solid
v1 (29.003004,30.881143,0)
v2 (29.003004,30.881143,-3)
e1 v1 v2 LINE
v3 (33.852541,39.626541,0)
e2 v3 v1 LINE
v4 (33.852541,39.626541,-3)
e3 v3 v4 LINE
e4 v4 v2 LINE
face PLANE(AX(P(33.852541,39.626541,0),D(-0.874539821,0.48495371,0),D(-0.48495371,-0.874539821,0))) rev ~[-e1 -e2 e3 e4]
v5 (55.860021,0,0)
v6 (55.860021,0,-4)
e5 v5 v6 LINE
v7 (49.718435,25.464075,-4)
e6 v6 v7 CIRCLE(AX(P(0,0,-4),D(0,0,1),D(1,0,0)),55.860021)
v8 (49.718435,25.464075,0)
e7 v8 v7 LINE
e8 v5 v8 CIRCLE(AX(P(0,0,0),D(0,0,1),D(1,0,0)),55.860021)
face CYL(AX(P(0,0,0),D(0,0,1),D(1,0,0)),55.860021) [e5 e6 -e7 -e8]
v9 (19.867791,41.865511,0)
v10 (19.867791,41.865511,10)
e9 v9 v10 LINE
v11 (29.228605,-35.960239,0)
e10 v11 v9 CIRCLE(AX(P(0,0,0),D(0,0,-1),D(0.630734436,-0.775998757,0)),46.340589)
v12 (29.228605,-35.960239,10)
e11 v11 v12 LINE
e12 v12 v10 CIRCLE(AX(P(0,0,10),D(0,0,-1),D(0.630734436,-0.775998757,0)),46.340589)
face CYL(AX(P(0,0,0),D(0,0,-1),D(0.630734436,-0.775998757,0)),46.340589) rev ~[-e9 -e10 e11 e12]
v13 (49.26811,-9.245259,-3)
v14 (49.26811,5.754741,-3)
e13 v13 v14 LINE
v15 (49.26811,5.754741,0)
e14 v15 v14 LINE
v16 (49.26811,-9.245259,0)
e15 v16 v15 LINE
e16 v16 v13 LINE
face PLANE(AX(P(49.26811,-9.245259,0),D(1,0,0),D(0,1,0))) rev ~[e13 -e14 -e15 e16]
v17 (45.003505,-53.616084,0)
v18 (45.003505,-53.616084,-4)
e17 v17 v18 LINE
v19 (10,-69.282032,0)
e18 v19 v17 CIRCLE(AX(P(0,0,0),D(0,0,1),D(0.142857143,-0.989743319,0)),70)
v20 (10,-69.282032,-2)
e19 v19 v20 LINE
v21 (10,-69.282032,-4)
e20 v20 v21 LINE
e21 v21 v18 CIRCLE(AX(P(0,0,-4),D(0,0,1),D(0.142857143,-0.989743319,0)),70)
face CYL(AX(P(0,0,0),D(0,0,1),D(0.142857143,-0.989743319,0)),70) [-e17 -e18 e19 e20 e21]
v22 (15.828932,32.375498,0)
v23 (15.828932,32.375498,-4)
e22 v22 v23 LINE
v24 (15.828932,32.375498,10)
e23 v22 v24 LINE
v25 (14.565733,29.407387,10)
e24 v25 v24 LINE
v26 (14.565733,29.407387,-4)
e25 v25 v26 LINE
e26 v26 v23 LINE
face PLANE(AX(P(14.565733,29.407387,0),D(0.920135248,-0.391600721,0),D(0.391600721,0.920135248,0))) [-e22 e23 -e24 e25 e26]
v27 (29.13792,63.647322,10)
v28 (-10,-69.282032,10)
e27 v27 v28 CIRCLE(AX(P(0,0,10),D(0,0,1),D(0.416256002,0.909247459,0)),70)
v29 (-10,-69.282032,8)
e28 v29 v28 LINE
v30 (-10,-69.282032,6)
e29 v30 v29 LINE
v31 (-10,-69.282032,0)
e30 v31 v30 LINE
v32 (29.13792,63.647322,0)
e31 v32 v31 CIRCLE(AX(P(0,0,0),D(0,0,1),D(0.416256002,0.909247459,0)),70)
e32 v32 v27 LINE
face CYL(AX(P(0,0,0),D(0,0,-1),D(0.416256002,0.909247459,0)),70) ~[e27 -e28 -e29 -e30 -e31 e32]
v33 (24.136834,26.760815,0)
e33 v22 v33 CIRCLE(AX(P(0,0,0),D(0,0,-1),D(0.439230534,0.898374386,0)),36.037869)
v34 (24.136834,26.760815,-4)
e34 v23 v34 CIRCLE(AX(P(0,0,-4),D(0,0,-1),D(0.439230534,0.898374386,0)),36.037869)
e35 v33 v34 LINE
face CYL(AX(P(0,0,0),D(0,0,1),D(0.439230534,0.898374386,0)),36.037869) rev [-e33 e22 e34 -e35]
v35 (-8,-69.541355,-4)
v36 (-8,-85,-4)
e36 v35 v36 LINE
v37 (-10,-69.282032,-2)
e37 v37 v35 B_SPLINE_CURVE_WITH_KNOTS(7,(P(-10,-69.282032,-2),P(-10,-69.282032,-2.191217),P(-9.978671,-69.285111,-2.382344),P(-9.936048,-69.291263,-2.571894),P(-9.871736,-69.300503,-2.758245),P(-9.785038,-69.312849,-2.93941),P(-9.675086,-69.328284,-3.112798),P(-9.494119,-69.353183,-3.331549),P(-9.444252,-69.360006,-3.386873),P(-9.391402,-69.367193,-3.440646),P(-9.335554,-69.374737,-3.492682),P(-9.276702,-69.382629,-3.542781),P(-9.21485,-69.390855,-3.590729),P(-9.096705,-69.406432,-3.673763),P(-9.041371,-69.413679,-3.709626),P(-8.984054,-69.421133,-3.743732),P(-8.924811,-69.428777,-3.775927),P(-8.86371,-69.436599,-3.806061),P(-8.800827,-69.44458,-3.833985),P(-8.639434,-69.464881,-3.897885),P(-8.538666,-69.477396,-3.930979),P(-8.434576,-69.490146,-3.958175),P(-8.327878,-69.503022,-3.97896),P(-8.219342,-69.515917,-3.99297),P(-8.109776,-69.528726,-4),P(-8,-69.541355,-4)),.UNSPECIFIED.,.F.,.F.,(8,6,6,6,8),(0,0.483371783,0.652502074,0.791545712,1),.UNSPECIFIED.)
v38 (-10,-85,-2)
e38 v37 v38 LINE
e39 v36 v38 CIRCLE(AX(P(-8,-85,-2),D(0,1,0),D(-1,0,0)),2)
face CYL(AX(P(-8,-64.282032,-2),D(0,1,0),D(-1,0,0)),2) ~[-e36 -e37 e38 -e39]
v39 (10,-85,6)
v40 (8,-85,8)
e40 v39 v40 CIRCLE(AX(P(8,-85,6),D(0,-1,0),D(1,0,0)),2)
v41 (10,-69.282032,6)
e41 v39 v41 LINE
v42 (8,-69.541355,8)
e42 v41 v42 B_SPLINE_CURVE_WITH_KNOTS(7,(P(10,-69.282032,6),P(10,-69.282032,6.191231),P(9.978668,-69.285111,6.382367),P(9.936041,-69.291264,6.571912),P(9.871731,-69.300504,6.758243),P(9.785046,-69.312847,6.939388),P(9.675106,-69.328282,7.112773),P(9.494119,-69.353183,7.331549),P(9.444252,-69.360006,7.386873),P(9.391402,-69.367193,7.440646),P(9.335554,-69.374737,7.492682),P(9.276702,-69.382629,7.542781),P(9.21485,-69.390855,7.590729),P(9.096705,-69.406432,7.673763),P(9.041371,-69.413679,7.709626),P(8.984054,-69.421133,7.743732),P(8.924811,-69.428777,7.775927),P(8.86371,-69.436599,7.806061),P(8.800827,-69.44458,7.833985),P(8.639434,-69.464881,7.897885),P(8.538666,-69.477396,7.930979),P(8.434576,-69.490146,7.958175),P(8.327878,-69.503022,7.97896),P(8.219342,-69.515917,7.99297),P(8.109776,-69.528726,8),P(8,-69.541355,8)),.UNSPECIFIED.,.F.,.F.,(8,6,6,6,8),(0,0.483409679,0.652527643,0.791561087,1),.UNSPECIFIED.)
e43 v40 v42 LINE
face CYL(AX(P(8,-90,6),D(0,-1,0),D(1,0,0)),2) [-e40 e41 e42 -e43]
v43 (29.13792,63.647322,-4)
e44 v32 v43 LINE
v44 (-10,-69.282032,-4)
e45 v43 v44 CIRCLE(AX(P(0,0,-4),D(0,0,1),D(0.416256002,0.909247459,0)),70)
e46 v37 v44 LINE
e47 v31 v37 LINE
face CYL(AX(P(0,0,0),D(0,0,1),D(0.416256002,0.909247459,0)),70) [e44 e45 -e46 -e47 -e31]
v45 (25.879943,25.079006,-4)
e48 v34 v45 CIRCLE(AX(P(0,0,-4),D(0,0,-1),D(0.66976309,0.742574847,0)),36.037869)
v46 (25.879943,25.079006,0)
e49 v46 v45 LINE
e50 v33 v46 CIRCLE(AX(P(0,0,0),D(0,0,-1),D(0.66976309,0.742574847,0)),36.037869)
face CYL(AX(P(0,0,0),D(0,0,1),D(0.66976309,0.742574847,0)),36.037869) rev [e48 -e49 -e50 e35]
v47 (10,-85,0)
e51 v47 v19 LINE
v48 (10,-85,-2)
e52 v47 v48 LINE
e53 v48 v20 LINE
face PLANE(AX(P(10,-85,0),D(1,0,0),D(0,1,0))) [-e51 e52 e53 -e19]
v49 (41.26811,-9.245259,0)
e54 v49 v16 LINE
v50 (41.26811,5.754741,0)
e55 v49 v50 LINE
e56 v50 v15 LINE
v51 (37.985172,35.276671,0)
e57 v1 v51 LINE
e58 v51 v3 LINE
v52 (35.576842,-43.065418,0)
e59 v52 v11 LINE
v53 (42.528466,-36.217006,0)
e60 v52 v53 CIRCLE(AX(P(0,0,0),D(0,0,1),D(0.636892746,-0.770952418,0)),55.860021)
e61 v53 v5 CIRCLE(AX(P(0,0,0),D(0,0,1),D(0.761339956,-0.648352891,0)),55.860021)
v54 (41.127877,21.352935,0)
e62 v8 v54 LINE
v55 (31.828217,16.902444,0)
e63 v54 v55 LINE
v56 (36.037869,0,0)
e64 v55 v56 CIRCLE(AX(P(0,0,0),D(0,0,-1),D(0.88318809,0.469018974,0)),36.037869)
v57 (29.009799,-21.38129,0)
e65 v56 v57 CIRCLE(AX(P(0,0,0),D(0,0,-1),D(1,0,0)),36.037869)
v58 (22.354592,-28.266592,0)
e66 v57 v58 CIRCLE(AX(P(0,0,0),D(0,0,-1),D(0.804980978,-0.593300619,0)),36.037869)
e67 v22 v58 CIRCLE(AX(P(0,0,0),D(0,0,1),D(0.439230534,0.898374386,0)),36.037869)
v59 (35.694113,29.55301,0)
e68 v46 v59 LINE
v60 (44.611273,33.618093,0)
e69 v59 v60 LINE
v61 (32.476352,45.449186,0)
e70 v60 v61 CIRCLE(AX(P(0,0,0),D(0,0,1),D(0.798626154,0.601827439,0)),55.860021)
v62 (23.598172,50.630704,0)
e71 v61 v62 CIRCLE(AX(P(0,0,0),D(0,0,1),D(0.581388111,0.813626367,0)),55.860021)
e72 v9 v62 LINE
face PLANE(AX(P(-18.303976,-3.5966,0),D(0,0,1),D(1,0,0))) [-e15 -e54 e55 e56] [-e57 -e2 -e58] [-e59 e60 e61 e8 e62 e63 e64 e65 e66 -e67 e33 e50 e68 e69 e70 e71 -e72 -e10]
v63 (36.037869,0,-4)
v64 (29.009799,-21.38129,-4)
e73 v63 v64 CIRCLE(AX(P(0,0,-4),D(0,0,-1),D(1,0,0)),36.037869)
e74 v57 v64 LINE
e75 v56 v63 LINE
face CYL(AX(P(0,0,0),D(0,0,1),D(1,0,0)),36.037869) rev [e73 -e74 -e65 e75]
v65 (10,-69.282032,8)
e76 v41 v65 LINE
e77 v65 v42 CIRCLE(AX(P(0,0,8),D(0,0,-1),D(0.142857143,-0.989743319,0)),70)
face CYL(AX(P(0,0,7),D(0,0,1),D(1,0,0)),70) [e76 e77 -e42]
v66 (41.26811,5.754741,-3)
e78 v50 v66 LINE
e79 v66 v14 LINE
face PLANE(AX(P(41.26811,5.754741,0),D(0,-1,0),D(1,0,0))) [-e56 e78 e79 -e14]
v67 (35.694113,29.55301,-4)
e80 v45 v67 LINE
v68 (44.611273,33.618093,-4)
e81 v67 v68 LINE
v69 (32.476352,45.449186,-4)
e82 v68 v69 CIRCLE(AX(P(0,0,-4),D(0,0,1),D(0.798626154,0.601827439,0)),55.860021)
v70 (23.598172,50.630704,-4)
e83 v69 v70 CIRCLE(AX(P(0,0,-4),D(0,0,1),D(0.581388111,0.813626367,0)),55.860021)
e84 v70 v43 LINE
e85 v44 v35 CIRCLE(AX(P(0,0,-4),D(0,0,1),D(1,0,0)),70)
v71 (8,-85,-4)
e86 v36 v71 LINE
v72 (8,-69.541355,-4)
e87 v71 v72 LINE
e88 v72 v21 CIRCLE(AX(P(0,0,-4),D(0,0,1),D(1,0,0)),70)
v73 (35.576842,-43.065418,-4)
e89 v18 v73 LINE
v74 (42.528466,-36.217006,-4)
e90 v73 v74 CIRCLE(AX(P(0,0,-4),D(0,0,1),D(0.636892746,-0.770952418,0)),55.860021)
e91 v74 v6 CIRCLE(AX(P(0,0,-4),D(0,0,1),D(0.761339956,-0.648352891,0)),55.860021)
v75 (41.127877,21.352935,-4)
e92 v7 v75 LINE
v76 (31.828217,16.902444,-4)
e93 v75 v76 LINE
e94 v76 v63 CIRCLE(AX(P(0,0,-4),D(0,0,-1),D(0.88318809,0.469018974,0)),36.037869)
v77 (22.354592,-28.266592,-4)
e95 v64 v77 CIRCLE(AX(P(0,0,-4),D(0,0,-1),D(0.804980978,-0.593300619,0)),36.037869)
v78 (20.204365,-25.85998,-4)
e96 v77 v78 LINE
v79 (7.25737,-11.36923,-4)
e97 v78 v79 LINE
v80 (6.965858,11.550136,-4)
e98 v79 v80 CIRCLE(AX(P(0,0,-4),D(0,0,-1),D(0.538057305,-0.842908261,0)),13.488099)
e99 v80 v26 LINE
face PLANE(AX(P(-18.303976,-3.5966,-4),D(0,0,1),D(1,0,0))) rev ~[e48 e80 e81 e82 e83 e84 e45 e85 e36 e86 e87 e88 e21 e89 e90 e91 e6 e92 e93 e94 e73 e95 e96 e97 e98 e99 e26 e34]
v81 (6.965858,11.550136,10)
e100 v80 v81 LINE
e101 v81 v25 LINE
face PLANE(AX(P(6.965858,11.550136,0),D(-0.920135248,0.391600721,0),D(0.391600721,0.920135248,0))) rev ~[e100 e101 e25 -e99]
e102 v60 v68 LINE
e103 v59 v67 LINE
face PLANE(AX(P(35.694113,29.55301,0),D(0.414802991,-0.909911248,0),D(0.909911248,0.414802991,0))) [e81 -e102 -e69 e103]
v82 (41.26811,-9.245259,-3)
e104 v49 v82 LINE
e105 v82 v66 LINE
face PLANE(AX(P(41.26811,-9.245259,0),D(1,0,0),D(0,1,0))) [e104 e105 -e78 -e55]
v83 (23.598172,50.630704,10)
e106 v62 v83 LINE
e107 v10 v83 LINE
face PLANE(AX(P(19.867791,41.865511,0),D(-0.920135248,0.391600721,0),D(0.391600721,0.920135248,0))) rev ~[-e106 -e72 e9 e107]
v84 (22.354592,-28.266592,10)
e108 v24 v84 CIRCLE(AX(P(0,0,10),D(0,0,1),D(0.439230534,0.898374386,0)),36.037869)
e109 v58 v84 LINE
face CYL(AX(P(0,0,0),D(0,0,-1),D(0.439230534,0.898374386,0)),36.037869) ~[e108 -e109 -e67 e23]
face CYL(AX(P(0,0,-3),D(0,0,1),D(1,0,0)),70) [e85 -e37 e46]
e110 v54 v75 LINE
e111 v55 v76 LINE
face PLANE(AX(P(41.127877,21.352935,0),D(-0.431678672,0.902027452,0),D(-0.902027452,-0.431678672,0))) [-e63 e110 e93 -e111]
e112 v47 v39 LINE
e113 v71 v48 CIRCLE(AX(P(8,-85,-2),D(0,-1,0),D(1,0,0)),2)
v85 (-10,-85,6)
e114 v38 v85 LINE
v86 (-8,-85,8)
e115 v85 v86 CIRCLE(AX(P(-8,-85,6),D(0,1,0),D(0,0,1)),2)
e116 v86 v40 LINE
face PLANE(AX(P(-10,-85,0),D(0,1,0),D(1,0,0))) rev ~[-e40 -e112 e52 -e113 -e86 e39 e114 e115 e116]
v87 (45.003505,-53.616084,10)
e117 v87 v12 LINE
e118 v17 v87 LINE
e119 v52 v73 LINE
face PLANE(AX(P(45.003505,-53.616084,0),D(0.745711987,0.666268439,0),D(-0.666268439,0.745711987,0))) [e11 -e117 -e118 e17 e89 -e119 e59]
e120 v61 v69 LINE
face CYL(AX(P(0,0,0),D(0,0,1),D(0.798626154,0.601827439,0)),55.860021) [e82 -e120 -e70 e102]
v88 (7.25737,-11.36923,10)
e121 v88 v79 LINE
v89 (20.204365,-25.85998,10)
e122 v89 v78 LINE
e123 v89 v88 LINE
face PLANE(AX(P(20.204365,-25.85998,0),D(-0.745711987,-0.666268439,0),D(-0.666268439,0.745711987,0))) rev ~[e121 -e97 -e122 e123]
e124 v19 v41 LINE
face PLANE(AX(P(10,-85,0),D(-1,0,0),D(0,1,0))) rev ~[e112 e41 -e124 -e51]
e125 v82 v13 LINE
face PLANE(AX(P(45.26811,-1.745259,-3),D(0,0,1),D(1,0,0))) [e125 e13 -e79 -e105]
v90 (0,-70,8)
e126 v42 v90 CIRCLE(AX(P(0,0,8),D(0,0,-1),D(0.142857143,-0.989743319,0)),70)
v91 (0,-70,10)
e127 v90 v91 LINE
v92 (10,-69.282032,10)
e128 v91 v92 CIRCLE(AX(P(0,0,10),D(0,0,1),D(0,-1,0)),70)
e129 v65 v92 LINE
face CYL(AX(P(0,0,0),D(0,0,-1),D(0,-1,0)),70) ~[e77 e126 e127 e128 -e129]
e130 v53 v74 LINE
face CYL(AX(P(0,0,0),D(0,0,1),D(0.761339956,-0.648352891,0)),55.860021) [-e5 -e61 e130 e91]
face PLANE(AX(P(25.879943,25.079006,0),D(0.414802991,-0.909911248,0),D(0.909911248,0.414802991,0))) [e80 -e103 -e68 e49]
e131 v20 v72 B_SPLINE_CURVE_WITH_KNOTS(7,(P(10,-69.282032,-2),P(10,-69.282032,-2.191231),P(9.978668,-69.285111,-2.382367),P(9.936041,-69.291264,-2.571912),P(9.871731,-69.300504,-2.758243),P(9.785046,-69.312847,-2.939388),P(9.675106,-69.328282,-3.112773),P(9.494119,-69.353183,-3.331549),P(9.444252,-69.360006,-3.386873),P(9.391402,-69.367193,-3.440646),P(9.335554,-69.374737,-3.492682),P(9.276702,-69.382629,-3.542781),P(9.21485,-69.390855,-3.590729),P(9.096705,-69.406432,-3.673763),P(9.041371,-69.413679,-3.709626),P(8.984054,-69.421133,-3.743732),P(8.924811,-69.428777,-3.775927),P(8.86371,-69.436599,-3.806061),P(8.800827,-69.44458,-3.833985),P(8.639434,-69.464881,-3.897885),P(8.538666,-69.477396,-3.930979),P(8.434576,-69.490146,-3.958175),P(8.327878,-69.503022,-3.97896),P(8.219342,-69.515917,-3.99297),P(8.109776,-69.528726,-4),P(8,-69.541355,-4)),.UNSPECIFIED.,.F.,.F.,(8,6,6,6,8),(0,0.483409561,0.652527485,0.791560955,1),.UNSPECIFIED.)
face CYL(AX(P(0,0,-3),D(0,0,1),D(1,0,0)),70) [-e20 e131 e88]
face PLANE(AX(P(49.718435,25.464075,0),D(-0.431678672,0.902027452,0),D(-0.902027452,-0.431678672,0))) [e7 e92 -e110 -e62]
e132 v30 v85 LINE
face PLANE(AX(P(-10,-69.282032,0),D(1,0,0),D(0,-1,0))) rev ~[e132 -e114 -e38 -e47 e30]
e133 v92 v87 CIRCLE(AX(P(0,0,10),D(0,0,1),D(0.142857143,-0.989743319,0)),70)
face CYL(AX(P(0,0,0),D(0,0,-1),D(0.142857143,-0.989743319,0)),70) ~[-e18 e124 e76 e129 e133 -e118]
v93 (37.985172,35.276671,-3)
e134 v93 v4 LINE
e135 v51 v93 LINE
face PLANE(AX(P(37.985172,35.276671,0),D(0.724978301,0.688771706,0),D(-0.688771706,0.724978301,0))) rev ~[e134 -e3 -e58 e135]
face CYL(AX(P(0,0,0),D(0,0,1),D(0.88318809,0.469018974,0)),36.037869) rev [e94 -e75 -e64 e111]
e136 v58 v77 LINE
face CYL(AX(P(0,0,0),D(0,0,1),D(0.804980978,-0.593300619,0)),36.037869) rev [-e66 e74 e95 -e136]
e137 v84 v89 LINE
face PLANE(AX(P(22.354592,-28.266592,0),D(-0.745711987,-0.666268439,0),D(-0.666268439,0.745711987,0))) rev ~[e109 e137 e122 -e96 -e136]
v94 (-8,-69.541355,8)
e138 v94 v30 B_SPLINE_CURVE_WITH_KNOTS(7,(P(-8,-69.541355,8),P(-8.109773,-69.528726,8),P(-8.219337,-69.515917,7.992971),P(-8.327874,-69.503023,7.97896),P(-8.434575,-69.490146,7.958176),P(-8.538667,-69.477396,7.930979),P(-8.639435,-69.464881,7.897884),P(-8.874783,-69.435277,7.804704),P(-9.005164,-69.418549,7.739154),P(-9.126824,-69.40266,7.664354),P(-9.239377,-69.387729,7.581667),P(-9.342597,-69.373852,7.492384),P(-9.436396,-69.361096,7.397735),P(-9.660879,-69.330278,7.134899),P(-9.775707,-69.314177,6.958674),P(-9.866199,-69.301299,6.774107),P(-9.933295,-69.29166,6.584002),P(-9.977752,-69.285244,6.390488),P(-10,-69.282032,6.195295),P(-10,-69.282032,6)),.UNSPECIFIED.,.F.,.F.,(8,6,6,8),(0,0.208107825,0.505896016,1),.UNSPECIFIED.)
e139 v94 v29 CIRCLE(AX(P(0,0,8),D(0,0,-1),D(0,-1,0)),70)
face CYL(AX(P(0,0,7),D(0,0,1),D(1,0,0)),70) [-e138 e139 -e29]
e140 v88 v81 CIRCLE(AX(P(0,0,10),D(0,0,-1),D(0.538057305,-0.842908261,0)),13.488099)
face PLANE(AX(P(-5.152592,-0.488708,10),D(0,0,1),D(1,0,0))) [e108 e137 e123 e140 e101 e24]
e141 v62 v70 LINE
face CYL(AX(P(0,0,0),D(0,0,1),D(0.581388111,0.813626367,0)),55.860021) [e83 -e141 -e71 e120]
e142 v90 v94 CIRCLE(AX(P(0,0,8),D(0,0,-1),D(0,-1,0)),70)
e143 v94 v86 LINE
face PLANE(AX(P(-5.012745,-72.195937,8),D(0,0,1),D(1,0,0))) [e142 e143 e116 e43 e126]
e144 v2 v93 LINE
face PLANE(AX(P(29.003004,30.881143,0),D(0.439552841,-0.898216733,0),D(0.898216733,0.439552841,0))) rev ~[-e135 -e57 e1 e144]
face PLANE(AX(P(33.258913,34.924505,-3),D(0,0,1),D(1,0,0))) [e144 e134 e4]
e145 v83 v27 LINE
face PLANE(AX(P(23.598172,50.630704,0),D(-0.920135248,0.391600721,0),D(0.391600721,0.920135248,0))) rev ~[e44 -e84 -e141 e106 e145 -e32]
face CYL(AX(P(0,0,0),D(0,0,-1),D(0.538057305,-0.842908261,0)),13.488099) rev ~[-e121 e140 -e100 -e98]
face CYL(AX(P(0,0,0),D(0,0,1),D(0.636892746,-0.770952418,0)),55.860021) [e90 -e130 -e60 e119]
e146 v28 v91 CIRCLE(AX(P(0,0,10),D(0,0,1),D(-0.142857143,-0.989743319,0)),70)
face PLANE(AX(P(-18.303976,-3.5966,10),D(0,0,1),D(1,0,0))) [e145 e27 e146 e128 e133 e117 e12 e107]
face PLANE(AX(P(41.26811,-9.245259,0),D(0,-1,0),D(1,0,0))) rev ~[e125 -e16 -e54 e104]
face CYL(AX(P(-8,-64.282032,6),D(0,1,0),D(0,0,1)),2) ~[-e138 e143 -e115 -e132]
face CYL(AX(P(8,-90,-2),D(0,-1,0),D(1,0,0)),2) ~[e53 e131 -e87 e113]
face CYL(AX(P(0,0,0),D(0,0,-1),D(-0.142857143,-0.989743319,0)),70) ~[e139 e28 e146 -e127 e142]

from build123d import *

# Parameters (mm, degrees)
F1_DEPTH     = 4
F2_DEPTH     = 10
F3_W         = 8
F3_H         = 15
F4_DEPTH     = 3
F5_DEPTH     = 4
F6_DEPTH     = 8
F7_T4_DEPTH  = 25.7179676972
F7_S5_R      = 70
F7_T6_DEPTH  = 14
F7_T10_DEPTH = 25.7179676972
F7_S11_R     = 70
F7_T12_DEPTH = 14
F7_T16_DEPTH = 25.7179676972
F7_S17_R     = 70
F7_T18_DEPTH = 14
F7_T22_DEPTH = 25.7179676972
F7_S23_R     = 70
F7_T24_DEPTH = 14


# Not quite as in the source:
# - a fillet or chamfer that OpenCascade refuses, or shapes differently, is made with other operations: its cross-section is extruded or revolved along the edge and cut away or added


with BuildPart() as f1:
    # F0 (on Top) → F1 (new body)
    with BuildSketch(Plane.XY):
        with BuildLine():
            Line((23.5981723771, 50.6307036507), (29.1379201291, 63.6473221004))
            ThreePointArc((29.1379201291, 63.6473221004), (-67.1499688178, 19.7707280537), (-10, -69.2820323028))
            ThreePointArc((-10, -69.2820323028), (-5.0128703757, -69.8202773598), (0, -70))
            ThreePointArc((0, -70), (5.0128703757, -69.8202773598), (10, -69.2820323028))
            ThreePointArc((10, -69.2820323028), (28.5954871466, -63.89286435), (45.0035054679, -53.6160842994))
            Line((45.0035054679, -53.6160842994), (35.576841855, -43.0654178585))
            ThreePointArc((35.576841855, -43.0654178585), (-55.4090369327, -7.0838208542), (23.5981723771, 50.6307036507))
        make_face()
        with BuildLine():
            Line((19.8677907274, 41.8655113026), (23.5981723771, 50.6307036507))
            ThreePointArc((23.5981723771, 50.6307036507), (-55.4090369327, -7.0838208542), (35.576841855, -43.0654178585))
            Line((35.576841855, -43.0654178585), (29.2286049616, -35.9602391123))
            ThreePointArc((29.2286049616, -35.9602391123), (-46.0089760191, -5.5339200114), (19.8677907274, 41.8655113026))
        make_face()
        with BuildLine():
            Line((14.5657325798, 29.407386674), (15.8289323737, 32.3754983065))
            ThreePointArc((15.8289323737, 32.3754983065), (-35.8310083049, -3.8557534328), (22.3545915501, -28.266592071))
            Line((22.3545915501, -28.266592071), (20.2043653008, -25.8599802663))
            ThreePointArc((20.2043653008, -25.8599802663), (-32.6475173449, -3.3308509117), (14.5657325798, 29.407386674))
        make_face()
        with BuildLine():
            Line((6.9658582886, 11.5501360659), (14.5657325798, 29.407386674))
            ThreePointArc((14.5657325798, 29.407386674), (-32.6475173449, -3.3308509117), (20.2043653008, -25.8599802663))
            Line((20.2043653008, -25.8599802663), (7.257370403, -11.3692303905))
            ThreePointArc((7.257370403, -11.3692303905), (-13.4870085006, -0.1715416686), (6.9658582886, 11.5501360659))
        make_face()
        with BuildLine():
            Line((15.8289323737, 32.3754983065), (19.8677907274, 41.8655113026))
            ThreePointArc((19.8677907274, 41.8655113026), (-46.0089760191, -5.5339200114), (29.2286049616, -35.9602391123))
            Line((29.2286049616, -35.9602391123), (22.3545915501, -28.266592071))
            ThreePointArc((22.3545915501, -28.266592071), (-35.8310083049, -3.8557534328), (15.8289323737, 32.3754983065))
        make_face()
        with BuildLine():
            ThreePointArc((32.4763517935, 45.4491855361), (28.1567060881, 48.2446037809), (23.5981723771, 50.6307036507))
            Line((23.5981723771, 50.6307036507), (19.8677907274, 41.8655113026))
            ThreePointArc((19.8677907274, 41.8655113026), (24.3303762174, 39.4396112828), (28.5006543682, 36.5398802079))
            Line((28.5006543682, 36.5398802079), (32.4763517935, 45.4491855361))
        make_face()
        with BuildLine():
            ThreePointArc((28.5006543682, 36.5398802079), (24.3303762174, 39.4396112828), (19.8677907274, 41.8655113026))
            Line((19.8677907274, 41.8655113026), (15.8289323737, 32.3754983065))
            ThreePointArc((15.8289323737, 32.3754983065), (20.1791178088, 29.8585196408), (24.1368343884, 26.7608149426))
            Line((24.1368343884, 26.7608149426), (28.5006543682, 36.5398802079))
        make_face()
        with BuildLine():
            ThreePointArc((35.6941134, 29.5530102292), (32.2869345127, 33.2416005149), (28.5006543682, 36.5398802079))
            Line((28.5006543682, 36.5398802079), (24.1368343884, 26.7608149426))
            ThreePointArc((24.1368343884, 26.7608149426), (25.022522536, 25.9345591175), (25.8799433339, 25.0790056366))
            Line((25.8799433339, 25.0790056366), (35.6941134, 29.5530102292))
        make_face()
        with BuildLine():
            ThreePointArc((44.6112733376, 33.6180930885), (38.9951173125, 39.9965338185), (32.4763517935, 45.4491855361))
            Line((32.4763517935, 45.4491855361), (28.5006543682, 36.5398802079))
            ThreePointArc((28.5006543682, 36.5398802079), (32.2869345127, 33.2416005149), (35.6941134, 29.5530102292))
            Line((35.6941134, 29.5530102292), (44.6112733376, 33.6180930885))
        make_face()
        with BuildLine():
            Line((22.3545915501, -28.266592071), (29.2286049616, -35.9602391123))
            ThreePointArc((29.2286049616, -35.9602391123), (32.8206282453, -32.7147750505), (36.0544716862, -29.1122863487))
            Line((36.0544716862, -29.1122863487), (29.0097989093, -21.3812899032))
            ThreePointArc((29.0097989093, -21.3812899032), (25.9119084265, -25.0459775688), (22.3545915501, -28.266592071))
        make_face()
        with BuildLine():
            Line((29.2286049616, -35.9602391123), (35.576841855, -43.0654178585))
            ThreePointArc((35.576841855, -43.0654178585), (39.2024865114, -39.7933027409), (42.5284655631, -36.2170057923))
            Line((42.5284655631, -36.2170057923), (36.0544716862, -29.1122863487))
            ThreePointArc((36.0544716862, -29.1122863487), (32.8206282453, -32.7147750505), (29.2286049616, -35.9602391123))
        make_face()
        with BuildLine():
            Line((36.0544716862, -29.1122863487), (42.5284655631, -36.2170057923))
            ThreePointArc((42.5284655631, -36.2170057923), (52.4212879012, -19.2963848035), (55.860020513, 0))
            ThreePointArc((55.860020513, 0), (54.3029220862, 13.0971197067), (49.7184350628, 25.4640748234))
            Line((49.7184350628, 25.4640748234), (41.1278773135, 21.3529354587))
            ThreePointArc((41.1278773135, 21.3529354587), (45.0185527566, 10.9899978491), (46.3405885269, 0))
            ThreePointArc((46.3405885269, 0), (43.6934524957, -15.4380165186), (36.0544716862, -29.1122863487))
        make_face()
        with BuildLine():
            Line((29.0097989093, -21.3812899032), (36.0544716862, -29.1122863487))
            ThreePointArc((36.0544716862, -29.1122863487), (43.6934524957, -15.4380165186), (46.3405885269, 0))
            ThreePointArc((46.3405885269, 0), (45.0185527566, 10.9899978491), (41.1278773135, 21.3529354587))
            Line((41.1278773135, 21.3529354587), (31.8282165391, 16.9024442795))
            ThreePointArc((31.8282165391, 16.9024442795), (34.9696231307, 8.7093885424), (36.0378688421, 0))
            ThreePointArc((36.0378688421, 0), (34.2357950026, -11.253369772), (29.0097989093, -21.3812899032))
        make_face()
    extrude(amount=-F1_DEPTH)

    # F0 (on Top) → F2 (join)
    with BuildSketch(Plane.XY):
        with BuildLine():
            Line((23.5981723771, 50.6307036507), (29.1379201291, 63.6473221004))
            ThreePointArc((29.1379201291, 63.6473221004), (-67.1499688178, 19.7707280537), (-10, -69.2820323028))
            ThreePointArc((-10, -69.2820323028), (-5.0128703757, -69.8202773598), (0, -70))
            ThreePointArc((0, -70), (5.0128703757, -69.8202773598), (10, -69.2820323028))
            ThreePointArc((10, -69.2820323028), (28.5954871466, -63.89286435), (45.0035054679, -53.6160842994))
            Line((45.0035054679, -53.6160842994), (35.576841855, -43.0654178585))
            ThreePointArc((35.576841855, -43.0654178585), (-55.4090369327, -7.0838208542), (23.5981723771, 50.6307036507))
        make_face()
        with BuildLine():
            Line((19.8677907274, 41.8655113026), (23.5981723771, 50.6307036507))
            ThreePointArc((23.5981723771, 50.6307036507), (-55.4090369327, -7.0838208542), (35.576841855, -43.0654178585))
            Line((35.576841855, -43.0654178585), (29.2286049616, -35.9602391123))
            ThreePointArc((29.2286049616, -35.9602391123), (-46.0089760191, -5.5339200114), (19.8677907274, 41.8655113026))
        make_face()
        with BuildLine():
            Line((6.9658582886, 11.5501360659), (14.5657325798, 29.407386674))
            ThreePointArc((14.5657325798, 29.407386674), (-32.6475173449, -3.3308509117), (20.2043653008, -25.8599802663))
            Line((20.2043653008, -25.8599802663), (7.257370403, -11.3692303905))
            ThreePointArc((7.257370403, -11.3692303905), (-13.4870085006, -0.1715416686), (6.9658582886, 11.5501360659))
        make_face()
        with BuildLine():
            Line((14.5657325798, 29.407386674), (15.8289323737, 32.3754983065))
            ThreePointArc((15.8289323737, 32.3754983065), (-35.8310083049, -3.8557534328), (22.3545915501, -28.266592071))
            Line((22.3545915501, -28.266592071), (20.2043653008, -25.8599802663))
            ThreePointArc((20.2043653008, -25.8599802663), (-32.6475173449, -3.3308509117), (14.5657325798, 29.407386674))
        make_face()
    extrude(amount=F2_DEPTH)

    # F3 (on face) → F4 (cut)
    with BuildSketch(Plane.XY):
        Polygon((37.9851715346, 35.276671204), (33.8525412993, 39.626541011), (29.0030042003, 30.8811427968), align=None)
        with Locations((45.2681102753, -1.745258756)):
            Rectangle(F3_W, F3_H)
    extrude(amount=-F4_DEPTH, mode=Mode.SUBTRACT)

    # F0 (on Top) → F5 (join)
    with BuildSketch(Plane.XY):
        with BuildLine():
            ThreePointArc((0, -70), (-5.0128703757, -69.8202773598), (-10, -69.2820323028))
            Line((-10, -69.2820323028), (-10, -74.2803270693))
            ThreePointArc((-10, -74.2803270693), (-5.0112133817, -74.7827167864), (0, -74.9504302157))
            Line((0, -74.9504302157), (0, -70))
        make_face()
        with BuildLine():
            ThreePointArc((10, -69.2820323028), (5.0128703757, -69.8202773598), (0, -70))
            Line((0, -70), (0, -74.9504302157))
            ThreePointArc((0, -74.9504302157), (5.0112133817, -74.7827167864), (10, -74.2803270693))
            Line((10, -74.2803270693), (10, -69.2820323028))
        make_face()
        with BuildLine():
            ThreePointArc((10, -74.2803270693), (5.0112133817, -74.7827167864), (0, -74.9504302157))
            Line((0, -74.9504302157), (0, -85))
            Line((0, -85), (10, -85))
            Line((10, -85), (10, -74.2803270693))
        make_face()
        with BuildLine():
            ThreePointArc((0, -74.9504302157), (-5.0112133817, -74.7827167864), (-10, -74.2803270693))
            Line((-10, -74.2803270693), (-10, -85))
            Line((-10, -85), (0, -85))
            Line((0, -85), (0, -74.9504302157))
        make_face()
    extrude(amount=-F5_DEPTH)

    # F0 (on Top) → F6 (join)
    with BuildSketch(Plane.XY):
        with BuildLine():
            ThreePointArc((0, -70), (-5.0128703757, -69.8202773598), (-10, -69.2820323028))
            Line((-10, -69.2820323028), (-10, -74.2803270693))
            ThreePointArc((-10, -74.2803270693), (-5.0112133817, -74.7827167864), (0, -74.9504302157))
            Line((0, -74.9504302157), (0, -70))
        make_face()
        with BuildLine():
            ThreePointArc((0, -74.9504302157), (-5.0112133817, -74.7827167864), (-10, -74.2803270693))
            Line((-10, -74.2803270693), (-10, -85))
            Line((-10, -85), (0, -85))
            Line((0, -85), (0, -74.9504302157))
        make_face()
        with BuildLine():
            ThreePointArc((10, -69.2820323028), (5.0128703757, -69.8202773598), (0, -70))
            Line((0, -70), (0, -74.9504302157))
            ThreePointArc((0, -74.9504302157), (5.0112133817, -74.7827167864), (10, -74.2803270693))
            Line((10, -74.2803270693), (10, -69.2820323028))
        make_face()
        with BuildLine():
            ThreePointArc((10, -74.2803270693), (5.0112133817, -74.7827167864), (0, -74.9504302157))
            Line((0, -74.9504302157), (0, -85))
            Line((0, -85), (10, -85))
            Line((10, -85), (10, -74.2803270693))
        make_face()
    extrude(amount=F6_DEPTH)

    # F7: fillet of radius 2 on 4 edges, made by hand


with BuildPart() as f7_tool2:
    # F7_s3 → F7_t4 (new body)
    with BuildSketch(Plane.XZ.offset(90)):
        with BuildLine():
            ThreePointArc((10, 6), (9.4142135624, 7.4142135624), (8, 8))
            Line((8, 8), (10, 8))
            Line((10, 8), (10, 6))
        make_face()
    extrude(amount=-F7_T4_DEPTH)

    # F7_s5 → F7_t6 (cut, symmetric)
    with BuildSketch(Plane.XY.offset(7)):
        Circle(F7_S5_R)
    extrude(amount=F7_T6_DEPTH, both=True, mode=Mode.SUBTRACT)


with BuildPart() as f1_1:
    add(f1.part)

    # F7_t1: cut F7_tool2
    add(f7_tool2.part, mode=Mode.SUBTRACT)


with BuildPart() as f7_tool8:
    # F7_s9 → F7_t10 (new body)
    with BuildSketch(Plane.XZ.offset(64.2820323028)):
        with BuildLine():
            ThreePointArc((-8, 8), (-9.4142135624, 7.4142135624), (-10, 6))
            Line((-10, 6), (-10, 8))
            Line((-10, 8), (-8, 8))
        make_face()
    extrude(amount=F7_T10_DEPTH)

    # F7_s11 → F7_t12 (cut, symmetric)
    with BuildSketch(Plane.XY.offset(7)):
        Circle(F7_S11_R)
    extrude(amount=F7_T12_DEPTH, both=True, mode=Mode.SUBTRACT)


with BuildPart() as f1_2:
    add(f1_1.part)

    # F7_t7: cut F7_tool8
    add(f7_tool8.part, mode=Mode.SUBTRACT)


with BuildPart() as f7_tool14:
    # F7_s15 → F7_t16 (new body)
    with BuildSketch(Plane.XZ.offset(90)):
        with BuildLine():
            ThreePointArc((10, -2), (9.4142135624, -3.4142135624), (8, -4))
            Line((8, -4), (10, -4))
            Line((10, -4), (10, -2))
        make_face()
    extrude(amount=-F7_T16_DEPTH)

    # F7_s17 → F7_t18 (cut, symmetric)
    with BuildSketch(Plane.XY.offset(-3)):
        Circle(F7_S17_R)
    extrude(amount=F7_T18_DEPTH, both=True, mode=Mode.SUBTRACT)


with BuildPart() as f1_3:
    add(f1_2.part)

    # F7_t13: cut F7_tool14
    add(f7_tool14.part, mode=Mode.SUBTRACT)


with BuildPart() as f7_tool20:
    # F7_s21 → F7_t22 (new body)
    with BuildSketch(Plane.XZ.offset(64.2820323028)):
        with BuildLine():
            ThreePointArc((-10, -2), (-9.4142135624, -3.4142135624), (-8, -4))
            Line((-8, -4), (-10, -4))
            Line((-10, -4), (-10, -2))
        make_face()
    extrude(amount=F7_T22_DEPTH)

    # F7_s23 → F7_t24 (cut, symmetric)
    with BuildSketch(Plane.XY.offset(-3)):
        Circle(F7_S23_R)
    extrude(amount=F7_T24_DEPTH, both=True, mode=Mode.SUBTRACT)


with BuildPart() as f1_4:
    add(f1_3.part)

    # F7_t19: cut F7_tool20
    add(f7_tool20.part, mode=Mode.SUBTRACT)


solid = f1_4.part
